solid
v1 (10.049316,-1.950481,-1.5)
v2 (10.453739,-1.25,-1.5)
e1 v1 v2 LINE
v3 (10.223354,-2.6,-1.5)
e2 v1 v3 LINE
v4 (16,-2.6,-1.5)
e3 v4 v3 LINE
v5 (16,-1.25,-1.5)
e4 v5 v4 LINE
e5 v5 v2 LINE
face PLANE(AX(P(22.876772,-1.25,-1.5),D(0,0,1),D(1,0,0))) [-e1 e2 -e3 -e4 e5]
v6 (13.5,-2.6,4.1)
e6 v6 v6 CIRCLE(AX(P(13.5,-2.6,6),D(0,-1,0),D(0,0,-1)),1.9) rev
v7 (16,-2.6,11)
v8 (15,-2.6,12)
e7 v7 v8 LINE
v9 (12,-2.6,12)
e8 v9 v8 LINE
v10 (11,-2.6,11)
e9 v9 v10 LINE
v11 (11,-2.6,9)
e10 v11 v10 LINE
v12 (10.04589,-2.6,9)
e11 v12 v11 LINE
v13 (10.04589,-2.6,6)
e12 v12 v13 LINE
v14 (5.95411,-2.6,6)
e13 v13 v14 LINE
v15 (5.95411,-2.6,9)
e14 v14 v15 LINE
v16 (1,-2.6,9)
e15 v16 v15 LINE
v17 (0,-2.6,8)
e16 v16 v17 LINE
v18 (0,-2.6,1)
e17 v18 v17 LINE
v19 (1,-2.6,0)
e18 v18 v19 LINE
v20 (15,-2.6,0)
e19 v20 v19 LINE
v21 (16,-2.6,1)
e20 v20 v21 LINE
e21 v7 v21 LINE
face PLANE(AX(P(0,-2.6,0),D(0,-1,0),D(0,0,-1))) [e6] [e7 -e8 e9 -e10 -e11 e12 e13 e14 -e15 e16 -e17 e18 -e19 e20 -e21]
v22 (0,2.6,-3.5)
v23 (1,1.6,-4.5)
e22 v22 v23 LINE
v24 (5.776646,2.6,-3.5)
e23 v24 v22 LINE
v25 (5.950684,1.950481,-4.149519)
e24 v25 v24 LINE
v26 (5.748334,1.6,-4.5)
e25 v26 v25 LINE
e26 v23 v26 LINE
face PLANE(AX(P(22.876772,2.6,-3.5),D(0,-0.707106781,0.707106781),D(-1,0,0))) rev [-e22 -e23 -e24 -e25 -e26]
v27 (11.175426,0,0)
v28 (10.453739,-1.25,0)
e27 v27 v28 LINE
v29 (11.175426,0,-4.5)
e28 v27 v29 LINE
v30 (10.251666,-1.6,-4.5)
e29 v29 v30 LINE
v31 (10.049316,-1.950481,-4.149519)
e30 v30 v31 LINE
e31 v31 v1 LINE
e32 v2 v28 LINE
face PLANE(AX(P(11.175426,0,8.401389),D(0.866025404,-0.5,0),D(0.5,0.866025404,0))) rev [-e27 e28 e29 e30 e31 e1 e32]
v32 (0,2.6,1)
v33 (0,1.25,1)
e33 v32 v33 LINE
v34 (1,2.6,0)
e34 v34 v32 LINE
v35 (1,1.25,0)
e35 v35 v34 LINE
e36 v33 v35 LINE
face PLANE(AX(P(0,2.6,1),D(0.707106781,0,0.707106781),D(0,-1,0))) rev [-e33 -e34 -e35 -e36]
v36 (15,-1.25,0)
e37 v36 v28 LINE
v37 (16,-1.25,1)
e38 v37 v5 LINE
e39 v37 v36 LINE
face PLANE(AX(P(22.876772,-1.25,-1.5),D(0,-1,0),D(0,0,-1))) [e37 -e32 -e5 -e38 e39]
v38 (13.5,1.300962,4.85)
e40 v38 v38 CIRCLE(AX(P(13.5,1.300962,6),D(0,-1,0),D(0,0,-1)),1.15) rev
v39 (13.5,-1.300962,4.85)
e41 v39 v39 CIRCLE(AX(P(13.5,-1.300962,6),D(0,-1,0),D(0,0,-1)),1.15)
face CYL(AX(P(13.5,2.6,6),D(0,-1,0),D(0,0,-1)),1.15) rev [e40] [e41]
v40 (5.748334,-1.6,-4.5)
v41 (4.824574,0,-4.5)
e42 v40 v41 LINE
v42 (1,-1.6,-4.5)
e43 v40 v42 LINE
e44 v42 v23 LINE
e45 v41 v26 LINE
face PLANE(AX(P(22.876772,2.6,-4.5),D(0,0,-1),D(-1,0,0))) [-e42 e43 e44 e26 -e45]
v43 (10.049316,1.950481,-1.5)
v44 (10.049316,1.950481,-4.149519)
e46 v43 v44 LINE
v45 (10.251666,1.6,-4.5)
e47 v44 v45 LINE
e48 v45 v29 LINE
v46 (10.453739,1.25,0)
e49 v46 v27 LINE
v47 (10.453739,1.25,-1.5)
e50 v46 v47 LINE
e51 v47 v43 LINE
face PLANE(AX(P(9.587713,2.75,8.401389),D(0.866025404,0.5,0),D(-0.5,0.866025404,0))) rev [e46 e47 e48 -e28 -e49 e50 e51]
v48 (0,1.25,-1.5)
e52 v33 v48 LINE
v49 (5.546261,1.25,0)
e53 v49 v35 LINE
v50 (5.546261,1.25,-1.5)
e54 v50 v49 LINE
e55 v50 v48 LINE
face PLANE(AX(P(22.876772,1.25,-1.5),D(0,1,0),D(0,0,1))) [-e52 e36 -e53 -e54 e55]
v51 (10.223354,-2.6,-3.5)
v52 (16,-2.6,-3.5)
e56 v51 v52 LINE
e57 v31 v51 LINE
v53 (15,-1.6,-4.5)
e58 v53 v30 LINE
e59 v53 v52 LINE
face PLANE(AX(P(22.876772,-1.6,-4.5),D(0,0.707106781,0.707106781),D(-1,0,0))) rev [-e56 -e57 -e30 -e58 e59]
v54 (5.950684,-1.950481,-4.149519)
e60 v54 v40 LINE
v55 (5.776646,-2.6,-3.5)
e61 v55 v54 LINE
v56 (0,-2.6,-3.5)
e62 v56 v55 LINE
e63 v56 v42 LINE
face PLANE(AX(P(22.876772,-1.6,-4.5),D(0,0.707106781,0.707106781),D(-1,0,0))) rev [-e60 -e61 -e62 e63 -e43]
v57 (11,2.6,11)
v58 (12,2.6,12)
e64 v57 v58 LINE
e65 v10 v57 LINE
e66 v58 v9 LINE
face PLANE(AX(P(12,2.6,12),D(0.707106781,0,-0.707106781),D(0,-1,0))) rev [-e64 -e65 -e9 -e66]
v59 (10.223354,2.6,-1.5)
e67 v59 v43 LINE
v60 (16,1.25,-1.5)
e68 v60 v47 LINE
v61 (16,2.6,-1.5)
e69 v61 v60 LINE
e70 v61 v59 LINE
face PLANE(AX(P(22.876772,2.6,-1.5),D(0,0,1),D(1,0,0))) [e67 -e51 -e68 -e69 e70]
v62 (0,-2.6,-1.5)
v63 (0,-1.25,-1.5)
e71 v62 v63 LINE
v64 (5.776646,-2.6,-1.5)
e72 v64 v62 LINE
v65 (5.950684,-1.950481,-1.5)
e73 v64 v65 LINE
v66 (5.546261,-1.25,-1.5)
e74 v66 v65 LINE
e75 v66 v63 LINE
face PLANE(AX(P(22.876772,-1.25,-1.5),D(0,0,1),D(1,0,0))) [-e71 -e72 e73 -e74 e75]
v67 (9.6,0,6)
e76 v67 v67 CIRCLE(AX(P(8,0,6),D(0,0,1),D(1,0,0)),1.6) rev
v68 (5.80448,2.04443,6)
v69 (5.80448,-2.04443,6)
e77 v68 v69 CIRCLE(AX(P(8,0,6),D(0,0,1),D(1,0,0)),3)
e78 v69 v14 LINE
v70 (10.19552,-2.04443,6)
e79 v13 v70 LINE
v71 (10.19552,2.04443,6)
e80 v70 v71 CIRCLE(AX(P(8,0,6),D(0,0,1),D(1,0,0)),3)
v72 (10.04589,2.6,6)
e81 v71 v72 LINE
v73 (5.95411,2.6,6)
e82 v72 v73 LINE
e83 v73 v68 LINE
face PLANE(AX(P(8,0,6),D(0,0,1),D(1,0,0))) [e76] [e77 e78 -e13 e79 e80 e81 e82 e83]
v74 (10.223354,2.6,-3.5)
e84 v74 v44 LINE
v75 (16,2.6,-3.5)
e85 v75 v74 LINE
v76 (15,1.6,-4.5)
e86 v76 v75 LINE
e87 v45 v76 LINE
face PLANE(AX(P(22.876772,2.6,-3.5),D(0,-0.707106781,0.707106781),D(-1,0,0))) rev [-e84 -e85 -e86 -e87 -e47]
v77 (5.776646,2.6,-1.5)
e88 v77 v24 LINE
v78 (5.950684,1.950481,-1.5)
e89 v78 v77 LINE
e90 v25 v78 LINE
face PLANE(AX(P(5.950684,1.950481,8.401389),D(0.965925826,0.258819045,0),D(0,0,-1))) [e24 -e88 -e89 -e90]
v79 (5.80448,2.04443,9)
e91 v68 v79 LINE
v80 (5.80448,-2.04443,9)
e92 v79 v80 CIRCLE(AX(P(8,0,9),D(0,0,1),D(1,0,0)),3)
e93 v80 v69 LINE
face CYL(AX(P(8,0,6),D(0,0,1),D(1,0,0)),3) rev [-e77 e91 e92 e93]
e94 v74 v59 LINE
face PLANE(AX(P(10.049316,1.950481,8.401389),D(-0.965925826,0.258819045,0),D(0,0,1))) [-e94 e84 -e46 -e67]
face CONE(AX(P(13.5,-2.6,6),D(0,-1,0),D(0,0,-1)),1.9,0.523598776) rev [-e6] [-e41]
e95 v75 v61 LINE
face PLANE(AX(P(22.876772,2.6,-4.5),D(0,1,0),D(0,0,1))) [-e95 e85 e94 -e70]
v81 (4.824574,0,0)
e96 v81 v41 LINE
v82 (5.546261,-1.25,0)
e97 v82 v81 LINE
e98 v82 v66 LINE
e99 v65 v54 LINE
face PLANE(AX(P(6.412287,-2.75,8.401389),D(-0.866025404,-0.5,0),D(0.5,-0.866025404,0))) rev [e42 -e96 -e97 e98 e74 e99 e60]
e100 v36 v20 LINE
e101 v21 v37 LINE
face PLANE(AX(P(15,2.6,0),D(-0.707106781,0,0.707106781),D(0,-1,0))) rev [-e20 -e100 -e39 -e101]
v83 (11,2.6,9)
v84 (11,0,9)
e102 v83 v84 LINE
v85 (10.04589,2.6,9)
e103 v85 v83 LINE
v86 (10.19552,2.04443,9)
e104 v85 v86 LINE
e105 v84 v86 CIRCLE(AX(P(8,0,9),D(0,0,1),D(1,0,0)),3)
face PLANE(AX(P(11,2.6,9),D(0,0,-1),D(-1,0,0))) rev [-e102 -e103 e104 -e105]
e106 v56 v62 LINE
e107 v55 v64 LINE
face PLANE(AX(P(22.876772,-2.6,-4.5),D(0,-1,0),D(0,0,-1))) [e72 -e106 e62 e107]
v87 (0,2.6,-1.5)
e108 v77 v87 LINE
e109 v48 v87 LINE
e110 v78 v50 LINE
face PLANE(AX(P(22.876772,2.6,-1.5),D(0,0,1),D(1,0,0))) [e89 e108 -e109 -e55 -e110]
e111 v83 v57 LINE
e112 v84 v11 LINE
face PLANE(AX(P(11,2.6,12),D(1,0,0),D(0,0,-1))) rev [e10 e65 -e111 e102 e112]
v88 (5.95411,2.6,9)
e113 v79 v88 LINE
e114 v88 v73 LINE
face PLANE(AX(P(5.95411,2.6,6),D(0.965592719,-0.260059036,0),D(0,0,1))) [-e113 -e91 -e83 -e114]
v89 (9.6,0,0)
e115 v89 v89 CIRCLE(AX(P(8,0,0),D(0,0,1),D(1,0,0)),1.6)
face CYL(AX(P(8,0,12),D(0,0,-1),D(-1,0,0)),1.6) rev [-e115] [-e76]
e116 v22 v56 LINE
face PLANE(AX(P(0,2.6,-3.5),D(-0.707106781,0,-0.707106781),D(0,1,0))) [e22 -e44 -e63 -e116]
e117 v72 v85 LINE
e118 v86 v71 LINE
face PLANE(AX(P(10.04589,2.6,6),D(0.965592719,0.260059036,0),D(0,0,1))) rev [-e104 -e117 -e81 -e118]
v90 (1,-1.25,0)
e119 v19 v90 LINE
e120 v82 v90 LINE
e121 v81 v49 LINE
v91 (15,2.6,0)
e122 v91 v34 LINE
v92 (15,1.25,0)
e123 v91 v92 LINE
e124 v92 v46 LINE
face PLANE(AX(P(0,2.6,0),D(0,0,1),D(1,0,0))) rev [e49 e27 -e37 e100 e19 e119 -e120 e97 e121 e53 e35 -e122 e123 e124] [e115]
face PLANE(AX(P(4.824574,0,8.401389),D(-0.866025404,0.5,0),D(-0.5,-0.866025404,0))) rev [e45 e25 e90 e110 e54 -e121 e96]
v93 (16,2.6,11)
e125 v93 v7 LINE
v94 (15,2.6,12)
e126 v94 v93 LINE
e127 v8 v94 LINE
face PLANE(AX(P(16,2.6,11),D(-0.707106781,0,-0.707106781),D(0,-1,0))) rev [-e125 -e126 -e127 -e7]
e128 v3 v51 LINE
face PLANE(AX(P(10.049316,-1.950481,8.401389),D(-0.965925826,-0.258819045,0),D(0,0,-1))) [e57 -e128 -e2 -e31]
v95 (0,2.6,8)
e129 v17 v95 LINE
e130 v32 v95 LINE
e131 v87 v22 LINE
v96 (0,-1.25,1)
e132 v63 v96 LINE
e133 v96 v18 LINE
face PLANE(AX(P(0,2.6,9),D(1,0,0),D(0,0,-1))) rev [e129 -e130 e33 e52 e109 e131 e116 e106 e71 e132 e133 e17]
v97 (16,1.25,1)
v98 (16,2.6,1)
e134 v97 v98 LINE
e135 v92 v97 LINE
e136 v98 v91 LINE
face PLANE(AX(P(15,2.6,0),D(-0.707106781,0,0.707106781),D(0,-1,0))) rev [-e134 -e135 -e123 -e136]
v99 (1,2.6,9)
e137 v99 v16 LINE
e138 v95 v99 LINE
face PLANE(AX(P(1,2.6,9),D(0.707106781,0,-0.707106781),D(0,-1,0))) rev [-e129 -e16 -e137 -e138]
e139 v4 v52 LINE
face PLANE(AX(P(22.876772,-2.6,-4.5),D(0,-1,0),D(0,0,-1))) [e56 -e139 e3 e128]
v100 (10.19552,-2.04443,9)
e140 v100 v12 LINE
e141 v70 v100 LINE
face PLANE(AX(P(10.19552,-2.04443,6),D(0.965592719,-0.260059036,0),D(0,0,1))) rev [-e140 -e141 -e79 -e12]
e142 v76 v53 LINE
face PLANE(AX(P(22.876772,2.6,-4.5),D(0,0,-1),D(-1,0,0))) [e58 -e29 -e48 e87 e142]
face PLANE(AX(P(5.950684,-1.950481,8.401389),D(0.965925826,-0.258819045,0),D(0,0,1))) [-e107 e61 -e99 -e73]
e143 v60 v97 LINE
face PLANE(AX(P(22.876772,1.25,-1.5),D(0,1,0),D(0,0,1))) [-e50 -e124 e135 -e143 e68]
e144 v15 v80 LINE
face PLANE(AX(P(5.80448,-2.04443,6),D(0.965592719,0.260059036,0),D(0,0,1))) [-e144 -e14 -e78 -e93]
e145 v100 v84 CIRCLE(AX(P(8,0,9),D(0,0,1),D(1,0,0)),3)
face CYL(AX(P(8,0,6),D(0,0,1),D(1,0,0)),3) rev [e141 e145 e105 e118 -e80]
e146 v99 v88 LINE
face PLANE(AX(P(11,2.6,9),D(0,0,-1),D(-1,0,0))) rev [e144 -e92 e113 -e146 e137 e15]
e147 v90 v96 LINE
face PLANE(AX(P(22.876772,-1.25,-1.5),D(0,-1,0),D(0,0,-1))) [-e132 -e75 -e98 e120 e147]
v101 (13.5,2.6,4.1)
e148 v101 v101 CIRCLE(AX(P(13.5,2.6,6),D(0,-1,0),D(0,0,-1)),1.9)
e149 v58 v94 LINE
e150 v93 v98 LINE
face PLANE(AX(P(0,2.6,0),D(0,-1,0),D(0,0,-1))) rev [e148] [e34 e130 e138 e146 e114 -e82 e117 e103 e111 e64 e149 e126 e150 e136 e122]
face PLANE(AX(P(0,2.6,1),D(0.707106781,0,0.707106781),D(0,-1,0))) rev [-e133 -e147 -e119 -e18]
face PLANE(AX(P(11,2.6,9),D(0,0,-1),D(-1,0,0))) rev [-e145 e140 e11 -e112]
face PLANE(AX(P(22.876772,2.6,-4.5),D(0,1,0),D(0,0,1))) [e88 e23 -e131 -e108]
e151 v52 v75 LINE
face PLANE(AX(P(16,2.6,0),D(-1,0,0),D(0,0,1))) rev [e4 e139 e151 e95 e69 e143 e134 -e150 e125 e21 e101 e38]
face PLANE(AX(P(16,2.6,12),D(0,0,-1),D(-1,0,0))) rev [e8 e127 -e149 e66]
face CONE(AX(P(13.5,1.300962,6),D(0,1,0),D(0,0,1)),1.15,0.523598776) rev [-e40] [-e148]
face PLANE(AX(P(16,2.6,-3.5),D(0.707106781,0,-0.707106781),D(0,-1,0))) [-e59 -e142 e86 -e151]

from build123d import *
from OCP.BRepFilletAPI import BRepFilletAPI_MakeChamfer

# Parameters (mm, degrees)
SKETCH1_R           = 1.15
BOSS_EXTRUDE1_DEPTH = 2.6
BOSS_EXTRUDE2_DEPTH = 16
SKETCH3_R           = 1.6
CUT_EXTRUDE1_DEPTH  = 24.13028318
SKETCH4_R           = 3
CUT_EXTRUDE2_DEPTH  = 3
CUT_EXTRUDE3_REACH  = 25.13
CHAMFER1_SIZE       = 0.549227511
CHAMFER1_SIZE_2     = 0.549038106
CHAMFER1_SIZE_3     = 0.75
CHAMFER2_SIZE       = 1
CHAMFER3_SIZE       = 0.75
CHAMFER3_SIZE2      = 1.299038106


with BuildPart() as part:
    # Sketch1 → Boss-Extrude1 (new, symmetric)
    with BuildSketch(Plane(origin=(0, 0, 0), x_dir=(1, 0, 0), z_dir=(0, 1, 0))):
        Polygon((0, 0), (16, 0), (16, -12), (11, -12), (11, -9), (0, -9), align=None)
        with Locations(Location((13.5, -6, 0), (0, 0, 270))):
            Circle(SKETCH1_R, mode=Mode.SUBTRACT)
    extrude(amount=BOSS_EXTRUDE1_DEPTH, both=True)

    # Sketch2 → Boss-Extrude2 (add)
    with BuildSketch(Plane.ZY):
        Polygon((-1.5, -1.25), (-1.5, -2.6), (-4.5, -2.6), (-4.5, 2.6), (-1.5, 2.6), (-1.5, 1.25), (0, 1.25), (0, -1.25), align=None)
    extrude(amount=-BOSS_EXTRUDE2_DEPTH)

    # Sketch3 → Cut-Extrude1 (cut, through all)
    with BuildSketch(Plane(origin=(0, 0, -4.5), x_dir=(-1, 0, 0), z_dir=(0, 0, -1))):
        with Locations((-8, 0)):
            Circle(SKETCH3_R)
    extrude(amount=-CUT_EXTRUDE1_DEPTH, mode=Mode.SUBTRACT)

    # Sketch4 → Cut-Extrude2 (cut)
    with BuildSketch(Plane.XY.offset(9)):
        with Locations((8, 0)):
            Circle(SKETCH4_R)
    extrude(amount=-CUT_EXTRUDE2_DEPTH, mode=Mode.SUBTRACT)

    # Cut-Extrude3: up to this face of the body (flat: up to its plane)
    cut_extrude3_end = Plane(part.part.faces().sort_by_distance((8, 1.937058452, 0))[0])
    # Sketch5 → Cut-Extrude3 (cut, up to the picked face)
    with BuildSketch(Plane(origin=(0, 0, -4.5), x_dir=(-1, 0, 0), z_dir=(0, 0, -1)), mode=Mode.PRIVATE) as cut_extrude3_sk1:
        Polygon((-4.824573519, 0), (-6.41228676, 2.75), (-9.58771324, 2.75), (-11.175426481, 0), (-9.58771324, -2.75), (-6.41228676, -2.75), align=None)
    cut_extrude3_tool1 = split(extrude(cut_extrude3_sk1.sketch, amount=-CUT_EXTRUDE3_REACH, mode=Mode.PRIVATE), bisect_by=cut_extrude3_end, keep=Keep.BOTH, mode=Mode.PRIVATE)
    add(cut_extrude3_tool1.solids().sort_by(Axis((8, 0, -4.5), (0, 0, 1)))[0], mode=Mode.SUBTRACT)

    # Chamfer1
    # the kernel refuses this chamfer: 0.75, 0.549227511, 0.549038106 mm, written as the material it takes off along each edge
    with BuildSketch(Plane(origin=(9.496662955, 2.6, 6), x_dir=(0.7827857508590854, -0.6222913049786071, 0), z_dir=(0, 0, 1)), Plane(origin=(6.503337045, -2.6, 6), x_dir=(-0.7827857508590857, 0.6222913049786067, 0), z_dir=(0, 0, 1))) as chamfer1_piece_1:
        with BuildLine():
            Line((0.892781916, 0), (CHAMFER1_SIZE * 0.782785751548, CHAMFER1_SIZE * 0.622291305526))
            Line((CHAMFER1_SIZE * 0.782785751548, CHAMFER1_SIZE * 0.622291305526), (0, 0))
            ThreePointArc((0, 0), (0.458630217, 0.033371738), (0.892781916, 0))
        make_face()
    extrude(amount=5.292721472, mode=Mode.SUBTRACT)
    with BuildSketch(Plane(origin=(9.496662955, -2.6, 6), x_dir=(0.7827857508590856, 0.6222913049786071, 0), z_dir=(0, 0, 1)), Plane(origin=(6.503337045, 2.6, 6), x_dir=(-0.7827857508590856, -0.622291304978607, 0), z_dir=(0, 0, 1))) as chamfer1_piece_2:
        with BuildLine():
            Line((0.892781916, 0), (CHAMFER1_SIZE * 0.782785751548, -CHAMFER1_SIZE * 0.622291305526))
            Line((CHAMFER1_SIZE * 0.782785751548, -CHAMFER1_SIZE * 0.622291305526), (0, 0))
            ThreePointArc((0, 0), (0.458630217, -0.033371738), (0.892781916, 0))
        make_face()
    extrude(amount=5.292721472, mode=Mode.SUBTRACT)
    with BuildSketch(Plane(origin=(6.325684219, -2.6, -6.428762241), x_dir=(-1, 0, 0), z_dir=(0, 0, 1)), Plane(origin=(9.674315781, -2.6, -1.5), x_dir=(1, 0, 0), z_dir=(0, 0, -1)), Plane(origin=(9.674315781, 2.6, -6.428762241), x_dir=(1, 0, 0), z_dir=(0, 0, 1)), Plane(origin=(6.325684219, 2.6, -1.5), x_dir=(-1, 0, 0), z_dir=(0, 0, -1))) as chamfer1_piece_3:
        Polygon((CHAMFER1_SIZE_2, 0), (CHAMFER1_SIZE_3 * 0.5, -CHAMFER1_SIZE_3 * 0.866025403784), (0, 0), align=None)
    extrude(amount=4.928762241, mode=Mode.SUBTRACT)

    # Chamfer2
    chamfer2_edges = [part.edges().sort_by_distance(p)[0] for p in [
        (16, 0, 12),
        (11, 0, 12),
        (0, 0, 9),
        (16, -1.925, 0),
        (16, 1.925, 0),
        (0, -1.925, 0),
        (0, 1.925, 0),
        (2.888323057, -2.6, -4.5),
        (0, 0, -4.5),
        (16, 0, -4.5),
        (2.888323057, 2.6, -4.5),
        (13.111676943, -2.6, -4.5),
        (13.111676943, 2.6, -4.5),
    ]]
    chamfer(chamfer2_edges, length=CHAMFER2_SIZE)

    # Chamfer3: one chamfer whose edges measure the first distance from different faces: ONE call of the kernel's chamfer builder (chamfer() names one face for all edges)
    chamfer3_edges_1 = [part.edges().sort_by_distance(p)[0] for p in [
        (13.5, -2.6, 4.85),
    ]]
    chamfer3_side_1 = [part.faces().sort_by_distance(p)[0] for p in [
        (8.413951701, -2.6, 4.798840105),
    ]]
    chamfer3_edges_2 = [part.edges().sort_by_distance(p)[0] for p in [
        (13.5, 2.6, 4.85),
    ]]
    chamfer3_side_2 = [part.faces().sort_by_distance(p)[0] for p in [
        (8.413951701, 2.6, 4.798840105),
    ]]
    chamfer3 = BRepFilletAPI_MakeChamfer(part.part.solid().wrapped)
    for e in chamfer3_edges_1:
        chamfer3.Add(CHAMFER3_SIZE, CHAMFER3_SIZE2, e.wrapped, chamfer3_side_1[0].wrapped)  # the first distance lies on this face
    for e in chamfer3_edges_2:
        chamfer3.Add(CHAMFER3_SIZE, CHAMFER3_SIZE2, e.wrapped, chamfer3_side_2[0].wrapped)  # the first distance lies on this face
    add(Compound.cast(chamfer3.Shape()), mode=Mode.REPLACE)


solid = part.part
